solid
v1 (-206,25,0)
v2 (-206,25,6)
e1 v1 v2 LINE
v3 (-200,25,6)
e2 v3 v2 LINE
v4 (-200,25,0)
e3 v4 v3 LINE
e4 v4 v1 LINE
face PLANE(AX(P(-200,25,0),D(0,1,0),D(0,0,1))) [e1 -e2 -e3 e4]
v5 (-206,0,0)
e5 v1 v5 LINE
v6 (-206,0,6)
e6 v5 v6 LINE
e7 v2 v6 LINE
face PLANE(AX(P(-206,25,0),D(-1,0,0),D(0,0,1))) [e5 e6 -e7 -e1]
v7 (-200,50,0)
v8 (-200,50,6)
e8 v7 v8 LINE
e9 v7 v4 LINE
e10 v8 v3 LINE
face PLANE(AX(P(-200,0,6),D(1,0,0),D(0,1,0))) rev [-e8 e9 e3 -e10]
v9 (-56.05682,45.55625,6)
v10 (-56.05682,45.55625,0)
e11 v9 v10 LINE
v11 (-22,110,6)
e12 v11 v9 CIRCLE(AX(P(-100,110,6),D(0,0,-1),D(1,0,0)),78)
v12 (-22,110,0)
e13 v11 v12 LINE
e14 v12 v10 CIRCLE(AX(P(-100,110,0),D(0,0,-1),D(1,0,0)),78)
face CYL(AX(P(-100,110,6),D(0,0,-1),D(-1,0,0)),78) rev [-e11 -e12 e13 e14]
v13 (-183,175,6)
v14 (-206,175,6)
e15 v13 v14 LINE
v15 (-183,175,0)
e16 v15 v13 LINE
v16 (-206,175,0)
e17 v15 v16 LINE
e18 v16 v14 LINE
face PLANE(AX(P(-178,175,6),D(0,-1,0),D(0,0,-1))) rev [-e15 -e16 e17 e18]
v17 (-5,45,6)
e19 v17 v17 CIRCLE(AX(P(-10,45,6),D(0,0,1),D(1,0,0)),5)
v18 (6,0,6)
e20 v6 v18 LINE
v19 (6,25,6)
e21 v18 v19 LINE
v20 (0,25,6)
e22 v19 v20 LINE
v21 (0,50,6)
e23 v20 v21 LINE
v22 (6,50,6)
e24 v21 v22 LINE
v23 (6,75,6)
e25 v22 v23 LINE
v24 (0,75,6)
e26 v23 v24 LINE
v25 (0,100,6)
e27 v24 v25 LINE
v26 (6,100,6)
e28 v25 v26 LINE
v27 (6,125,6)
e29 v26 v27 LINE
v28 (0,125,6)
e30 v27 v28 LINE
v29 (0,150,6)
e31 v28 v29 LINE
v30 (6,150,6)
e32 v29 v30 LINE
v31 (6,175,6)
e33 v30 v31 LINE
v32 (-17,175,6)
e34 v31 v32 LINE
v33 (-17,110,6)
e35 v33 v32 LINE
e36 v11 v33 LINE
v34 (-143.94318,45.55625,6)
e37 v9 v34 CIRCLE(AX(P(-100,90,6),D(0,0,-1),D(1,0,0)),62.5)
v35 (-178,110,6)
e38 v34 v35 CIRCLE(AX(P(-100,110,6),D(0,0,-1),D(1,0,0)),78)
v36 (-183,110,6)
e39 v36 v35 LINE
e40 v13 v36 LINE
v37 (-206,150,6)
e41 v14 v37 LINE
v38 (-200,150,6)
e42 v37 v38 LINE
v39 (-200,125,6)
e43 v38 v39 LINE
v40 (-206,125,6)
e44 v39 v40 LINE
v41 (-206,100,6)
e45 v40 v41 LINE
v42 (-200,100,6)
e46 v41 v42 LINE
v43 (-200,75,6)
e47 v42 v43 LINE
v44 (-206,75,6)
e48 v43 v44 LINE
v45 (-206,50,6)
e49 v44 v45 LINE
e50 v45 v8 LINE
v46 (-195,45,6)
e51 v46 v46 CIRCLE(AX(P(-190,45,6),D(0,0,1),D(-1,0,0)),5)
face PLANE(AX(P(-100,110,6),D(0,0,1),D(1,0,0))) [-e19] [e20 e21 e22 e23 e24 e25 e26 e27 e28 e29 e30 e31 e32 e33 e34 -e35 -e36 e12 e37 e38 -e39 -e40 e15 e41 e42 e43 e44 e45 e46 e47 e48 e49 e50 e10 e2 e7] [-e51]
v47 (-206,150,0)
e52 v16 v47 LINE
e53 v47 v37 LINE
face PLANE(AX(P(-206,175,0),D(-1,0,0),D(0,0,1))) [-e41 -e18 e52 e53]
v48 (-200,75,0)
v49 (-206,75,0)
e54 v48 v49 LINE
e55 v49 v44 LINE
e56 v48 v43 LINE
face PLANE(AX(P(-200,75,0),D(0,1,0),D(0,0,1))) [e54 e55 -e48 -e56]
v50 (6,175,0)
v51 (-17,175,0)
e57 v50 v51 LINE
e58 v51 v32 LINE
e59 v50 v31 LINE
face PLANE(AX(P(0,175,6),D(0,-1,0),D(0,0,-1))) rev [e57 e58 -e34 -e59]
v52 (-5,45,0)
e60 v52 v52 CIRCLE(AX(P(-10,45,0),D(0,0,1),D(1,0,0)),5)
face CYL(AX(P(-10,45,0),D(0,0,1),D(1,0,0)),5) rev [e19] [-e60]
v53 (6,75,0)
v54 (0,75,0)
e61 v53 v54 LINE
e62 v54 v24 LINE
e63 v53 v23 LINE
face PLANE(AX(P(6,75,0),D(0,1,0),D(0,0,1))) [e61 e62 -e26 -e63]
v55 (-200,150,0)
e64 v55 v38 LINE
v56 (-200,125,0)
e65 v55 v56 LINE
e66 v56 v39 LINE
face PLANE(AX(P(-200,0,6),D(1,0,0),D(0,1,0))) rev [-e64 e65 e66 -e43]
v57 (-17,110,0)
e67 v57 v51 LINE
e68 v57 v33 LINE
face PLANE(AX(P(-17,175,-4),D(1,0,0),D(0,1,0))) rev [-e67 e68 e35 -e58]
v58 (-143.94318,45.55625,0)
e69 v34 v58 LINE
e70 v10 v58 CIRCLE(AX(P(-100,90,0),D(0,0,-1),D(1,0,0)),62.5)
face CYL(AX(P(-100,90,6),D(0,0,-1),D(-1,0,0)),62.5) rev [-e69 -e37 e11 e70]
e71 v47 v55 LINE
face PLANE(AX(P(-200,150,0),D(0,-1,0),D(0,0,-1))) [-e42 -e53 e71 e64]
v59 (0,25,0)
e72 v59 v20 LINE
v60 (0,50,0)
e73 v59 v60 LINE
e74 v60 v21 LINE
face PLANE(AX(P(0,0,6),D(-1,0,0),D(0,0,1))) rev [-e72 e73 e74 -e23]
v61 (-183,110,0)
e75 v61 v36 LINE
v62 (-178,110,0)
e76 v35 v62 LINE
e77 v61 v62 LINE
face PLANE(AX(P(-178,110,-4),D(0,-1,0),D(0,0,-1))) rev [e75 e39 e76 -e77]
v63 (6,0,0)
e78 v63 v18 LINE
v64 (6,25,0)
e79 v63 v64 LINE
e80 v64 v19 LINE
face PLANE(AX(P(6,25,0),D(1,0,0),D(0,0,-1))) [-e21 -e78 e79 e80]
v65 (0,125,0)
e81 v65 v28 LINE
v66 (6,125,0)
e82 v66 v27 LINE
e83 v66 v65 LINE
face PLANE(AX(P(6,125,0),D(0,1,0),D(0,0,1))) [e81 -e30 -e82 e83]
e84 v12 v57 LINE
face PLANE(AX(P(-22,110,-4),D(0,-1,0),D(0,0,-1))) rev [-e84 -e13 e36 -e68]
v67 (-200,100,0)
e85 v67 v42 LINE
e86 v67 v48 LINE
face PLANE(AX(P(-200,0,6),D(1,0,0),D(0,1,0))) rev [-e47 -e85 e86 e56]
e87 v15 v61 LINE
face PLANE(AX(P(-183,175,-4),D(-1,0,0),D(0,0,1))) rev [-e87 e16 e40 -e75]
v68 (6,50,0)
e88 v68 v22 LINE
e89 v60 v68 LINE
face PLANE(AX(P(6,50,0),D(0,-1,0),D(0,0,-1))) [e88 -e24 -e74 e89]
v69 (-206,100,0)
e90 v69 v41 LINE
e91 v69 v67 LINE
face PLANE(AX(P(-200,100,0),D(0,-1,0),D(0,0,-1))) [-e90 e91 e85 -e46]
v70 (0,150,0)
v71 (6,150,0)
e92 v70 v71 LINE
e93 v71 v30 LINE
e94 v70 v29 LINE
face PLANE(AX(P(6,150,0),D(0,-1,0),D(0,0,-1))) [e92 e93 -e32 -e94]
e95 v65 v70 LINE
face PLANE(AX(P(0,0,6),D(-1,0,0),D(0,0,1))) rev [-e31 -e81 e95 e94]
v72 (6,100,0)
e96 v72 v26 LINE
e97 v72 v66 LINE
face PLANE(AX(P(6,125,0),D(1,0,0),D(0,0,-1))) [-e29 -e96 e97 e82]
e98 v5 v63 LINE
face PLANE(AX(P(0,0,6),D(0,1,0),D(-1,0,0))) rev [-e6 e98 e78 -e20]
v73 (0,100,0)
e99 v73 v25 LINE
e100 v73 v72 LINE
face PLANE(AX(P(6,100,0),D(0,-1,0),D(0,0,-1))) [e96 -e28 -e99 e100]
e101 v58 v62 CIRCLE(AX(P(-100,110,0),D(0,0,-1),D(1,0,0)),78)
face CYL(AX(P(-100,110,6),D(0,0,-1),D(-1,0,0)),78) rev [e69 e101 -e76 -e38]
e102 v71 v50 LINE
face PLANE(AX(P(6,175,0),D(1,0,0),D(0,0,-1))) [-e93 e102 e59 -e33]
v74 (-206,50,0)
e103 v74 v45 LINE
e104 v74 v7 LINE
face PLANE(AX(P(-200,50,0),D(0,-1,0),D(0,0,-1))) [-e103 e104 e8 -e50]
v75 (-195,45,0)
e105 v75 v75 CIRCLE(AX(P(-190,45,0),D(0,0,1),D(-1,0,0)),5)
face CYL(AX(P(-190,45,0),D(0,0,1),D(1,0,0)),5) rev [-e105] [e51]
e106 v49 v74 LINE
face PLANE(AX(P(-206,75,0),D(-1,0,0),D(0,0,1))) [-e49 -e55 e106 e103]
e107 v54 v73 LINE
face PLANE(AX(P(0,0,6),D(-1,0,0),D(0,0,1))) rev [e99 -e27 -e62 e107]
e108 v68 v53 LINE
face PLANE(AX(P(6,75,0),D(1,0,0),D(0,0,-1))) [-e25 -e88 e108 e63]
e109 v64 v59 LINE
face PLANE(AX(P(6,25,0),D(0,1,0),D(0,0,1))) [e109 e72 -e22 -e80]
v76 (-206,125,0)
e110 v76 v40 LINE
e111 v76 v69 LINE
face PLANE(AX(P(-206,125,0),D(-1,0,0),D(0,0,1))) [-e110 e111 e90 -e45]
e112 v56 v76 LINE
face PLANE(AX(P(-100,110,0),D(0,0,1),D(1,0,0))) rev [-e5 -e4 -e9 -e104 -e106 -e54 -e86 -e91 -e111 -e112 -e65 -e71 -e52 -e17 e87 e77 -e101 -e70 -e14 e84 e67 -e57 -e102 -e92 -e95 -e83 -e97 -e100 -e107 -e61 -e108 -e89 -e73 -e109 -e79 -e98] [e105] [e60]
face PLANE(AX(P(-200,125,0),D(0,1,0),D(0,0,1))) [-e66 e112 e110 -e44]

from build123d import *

# Parameters (mm, degrees)
BOSS_EXTRUDE1_DEPTH   = 6
SKETCH2_W             = 6
SKETCH2_H             = 25
BOSS_EXTRUDE2_DEPTH   = 6
LPATTERN1_OUTLINE_W   = 6
LPATTERN1_OUTLINE_H   = 6
LPATTERN1_DEPTH       = 25
LPATTERN1_START       = 50
LPATTERN1_2_OUTLINE_W = 6
LPATTERN1_2_OUTLINE_H = 6
LPATTERN1_2_DEPTH     = 25
LPATTERN1_START_2     = 100
LPATTERN1_3_OUTLINE_W = 6
LPATTERN1_3_OUTLINE_H = 6
LPATTERN1_3_DEPTH     = 25
LPATTERN1_START_3     = 150
LPATTERN1_4_OUTLINE_W = 6
LPATTERN1_4_OUTLINE_H = 6
LPATTERN1_4_DEPTH     = 25
SKETCH5_R             = 5
CUT_EXTRUDE1_DEPTH    = 271.364568685
SKETCH6_W             = 5
SKETCH6_H             = 65
CUT_EXTRUDE2_DEPTH    = 10


# Read off the part's stored shape, not the designer's step: LPattern1
with BuildPart() as part:
    # Sketch1 → Boss-Extrude1 (new body)
    with BuildSketch(Plane.XY):
        with BuildLine():
            Line((-178, 175), (-200, 175))
            Line((-200, 175), (-200, 0))
            Line((-200, 0), (0, 0))
            Line((0, 0), (0, 175))
            Line((0, 175), (-22, 175))
            Line((-22, 175), (-22, 110))
            ThreePointArc((-22, 110), (-31.037807258, 73.555302549), (-56.056819802, 45.55625))
            ThreePointArc((-56.056819802, 45.55625), (-100, 27.5), (-143.943180198, 45.55625))
            ThreePointArc((-143.943180198, 45.55625), (-168.962192742, 73.555302549), (-178, 110))
            Line((-178, 110), (-178, 175))
        make_face()
    extrude(amount=BOSS_EXTRUDE1_DEPTH)

    # Sketch2 → Boss-Extrude2 (add)
    with BuildSketch(Plane.XY.offset(6)):
        with Locations((-203, 162.5)):
            Rectangle(SKETCH2_W, SKETCH2_H)
    extrude(amount=-BOSS_EXTRUDE2_DEPTH)

    # LPattern1 outline → LPattern1 (add)
    with BuildSketch(Plane(origin=(0, 0, 0), x_dir=(1, 0, 0), z_dir=(0, 1, 0))):
        with Locations((-203, -3)):
            Rectangle(LPATTERN1_OUTLINE_W, LPATTERN1_OUTLINE_H)
        with Locations((3, -3)):
            Rectangle(LPATTERN1_OUTLINE_W, LPATTERN1_OUTLINE_H)
    extrude(amount=LPATTERN1_DEPTH)

    # LPattern1 2 outline → LPattern1 2 (add)
    with BuildSketch(Plane(origin=(0, 0, 0), x_dir=(1, 0, 0), z_dir=(0, 1, 0)).offset(LPATTERN1_START)):
        with Locations((-203, -3)):
            Rectangle(LPATTERN1_2_OUTLINE_W, LPATTERN1_2_OUTLINE_H)
        with Locations((3, -3)):
            Rectangle(LPATTERN1_2_OUTLINE_W, LPATTERN1_2_OUTLINE_H)
    extrude(amount=LPATTERN1_2_DEPTH)

    # LPattern1 3 outline → LPattern1 3 (add)
    with BuildSketch(Plane(origin=(0, 0, 0), x_dir=(1, 0, 0), z_dir=(0, 1, 0)).offset(LPATTERN1_START_2)):
        with Locations((-203, -3)):
            Rectangle(LPATTERN1_3_OUTLINE_W, LPATTERN1_3_OUTLINE_H)
        with Locations((3, -3)):
            Rectangle(LPATTERN1_3_OUTLINE_W, LPATTERN1_3_OUTLINE_H)
    extrude(amount=LPATTERN1_3_DEPTH)

    # LPattern1 4 outline → LPattern1 4 (add)
    with BuildSketch(Plane(origin=(0, 0, 0), x_dir=(1, 0, 0), z_dir=(0, 1, 0)).offset(LPATTERN1_START_3)):
        with Locations((3, -3)):
            Rectangle(LPATTERN1_4_OUTLINE_W, LPATTERN1_4_OUTLINE_H)
    extrude(amount=LPATTERN1_4_DEPTH)

    # Sketch5 → Cut-Extrude1 (cut, through all)
    with BuildSketch(Plane.XY.offset(6)):
        with Locations((-10, 45)):
            Circle(SKETCH5_R)
        with Locations(Location((-190, 45, 0), (0, 0, 180))):
            Circle(SKETCH5_R)
    extrude(amount=-CUT_EXTRUDE1_DEPTH, mode=Mode.SUBTRACT)

    # Sketch6 → Cut-Extrude2 (cut)
    with BuildSketch(Plane.XY.offset(6)):
        with Locations((-180.5, 142.5)):
            Rectangle(SKETCH6_W, SKETCH6_H)
        with Locations((-19.5, 142.5)):
            Rectangle(SKETCH6_W, SKETCH6_H)
    extrude(amount=-CUT_EXTRUDE2_DEPTH, mode=Mode.SUBTRACT)


solid = part.part
